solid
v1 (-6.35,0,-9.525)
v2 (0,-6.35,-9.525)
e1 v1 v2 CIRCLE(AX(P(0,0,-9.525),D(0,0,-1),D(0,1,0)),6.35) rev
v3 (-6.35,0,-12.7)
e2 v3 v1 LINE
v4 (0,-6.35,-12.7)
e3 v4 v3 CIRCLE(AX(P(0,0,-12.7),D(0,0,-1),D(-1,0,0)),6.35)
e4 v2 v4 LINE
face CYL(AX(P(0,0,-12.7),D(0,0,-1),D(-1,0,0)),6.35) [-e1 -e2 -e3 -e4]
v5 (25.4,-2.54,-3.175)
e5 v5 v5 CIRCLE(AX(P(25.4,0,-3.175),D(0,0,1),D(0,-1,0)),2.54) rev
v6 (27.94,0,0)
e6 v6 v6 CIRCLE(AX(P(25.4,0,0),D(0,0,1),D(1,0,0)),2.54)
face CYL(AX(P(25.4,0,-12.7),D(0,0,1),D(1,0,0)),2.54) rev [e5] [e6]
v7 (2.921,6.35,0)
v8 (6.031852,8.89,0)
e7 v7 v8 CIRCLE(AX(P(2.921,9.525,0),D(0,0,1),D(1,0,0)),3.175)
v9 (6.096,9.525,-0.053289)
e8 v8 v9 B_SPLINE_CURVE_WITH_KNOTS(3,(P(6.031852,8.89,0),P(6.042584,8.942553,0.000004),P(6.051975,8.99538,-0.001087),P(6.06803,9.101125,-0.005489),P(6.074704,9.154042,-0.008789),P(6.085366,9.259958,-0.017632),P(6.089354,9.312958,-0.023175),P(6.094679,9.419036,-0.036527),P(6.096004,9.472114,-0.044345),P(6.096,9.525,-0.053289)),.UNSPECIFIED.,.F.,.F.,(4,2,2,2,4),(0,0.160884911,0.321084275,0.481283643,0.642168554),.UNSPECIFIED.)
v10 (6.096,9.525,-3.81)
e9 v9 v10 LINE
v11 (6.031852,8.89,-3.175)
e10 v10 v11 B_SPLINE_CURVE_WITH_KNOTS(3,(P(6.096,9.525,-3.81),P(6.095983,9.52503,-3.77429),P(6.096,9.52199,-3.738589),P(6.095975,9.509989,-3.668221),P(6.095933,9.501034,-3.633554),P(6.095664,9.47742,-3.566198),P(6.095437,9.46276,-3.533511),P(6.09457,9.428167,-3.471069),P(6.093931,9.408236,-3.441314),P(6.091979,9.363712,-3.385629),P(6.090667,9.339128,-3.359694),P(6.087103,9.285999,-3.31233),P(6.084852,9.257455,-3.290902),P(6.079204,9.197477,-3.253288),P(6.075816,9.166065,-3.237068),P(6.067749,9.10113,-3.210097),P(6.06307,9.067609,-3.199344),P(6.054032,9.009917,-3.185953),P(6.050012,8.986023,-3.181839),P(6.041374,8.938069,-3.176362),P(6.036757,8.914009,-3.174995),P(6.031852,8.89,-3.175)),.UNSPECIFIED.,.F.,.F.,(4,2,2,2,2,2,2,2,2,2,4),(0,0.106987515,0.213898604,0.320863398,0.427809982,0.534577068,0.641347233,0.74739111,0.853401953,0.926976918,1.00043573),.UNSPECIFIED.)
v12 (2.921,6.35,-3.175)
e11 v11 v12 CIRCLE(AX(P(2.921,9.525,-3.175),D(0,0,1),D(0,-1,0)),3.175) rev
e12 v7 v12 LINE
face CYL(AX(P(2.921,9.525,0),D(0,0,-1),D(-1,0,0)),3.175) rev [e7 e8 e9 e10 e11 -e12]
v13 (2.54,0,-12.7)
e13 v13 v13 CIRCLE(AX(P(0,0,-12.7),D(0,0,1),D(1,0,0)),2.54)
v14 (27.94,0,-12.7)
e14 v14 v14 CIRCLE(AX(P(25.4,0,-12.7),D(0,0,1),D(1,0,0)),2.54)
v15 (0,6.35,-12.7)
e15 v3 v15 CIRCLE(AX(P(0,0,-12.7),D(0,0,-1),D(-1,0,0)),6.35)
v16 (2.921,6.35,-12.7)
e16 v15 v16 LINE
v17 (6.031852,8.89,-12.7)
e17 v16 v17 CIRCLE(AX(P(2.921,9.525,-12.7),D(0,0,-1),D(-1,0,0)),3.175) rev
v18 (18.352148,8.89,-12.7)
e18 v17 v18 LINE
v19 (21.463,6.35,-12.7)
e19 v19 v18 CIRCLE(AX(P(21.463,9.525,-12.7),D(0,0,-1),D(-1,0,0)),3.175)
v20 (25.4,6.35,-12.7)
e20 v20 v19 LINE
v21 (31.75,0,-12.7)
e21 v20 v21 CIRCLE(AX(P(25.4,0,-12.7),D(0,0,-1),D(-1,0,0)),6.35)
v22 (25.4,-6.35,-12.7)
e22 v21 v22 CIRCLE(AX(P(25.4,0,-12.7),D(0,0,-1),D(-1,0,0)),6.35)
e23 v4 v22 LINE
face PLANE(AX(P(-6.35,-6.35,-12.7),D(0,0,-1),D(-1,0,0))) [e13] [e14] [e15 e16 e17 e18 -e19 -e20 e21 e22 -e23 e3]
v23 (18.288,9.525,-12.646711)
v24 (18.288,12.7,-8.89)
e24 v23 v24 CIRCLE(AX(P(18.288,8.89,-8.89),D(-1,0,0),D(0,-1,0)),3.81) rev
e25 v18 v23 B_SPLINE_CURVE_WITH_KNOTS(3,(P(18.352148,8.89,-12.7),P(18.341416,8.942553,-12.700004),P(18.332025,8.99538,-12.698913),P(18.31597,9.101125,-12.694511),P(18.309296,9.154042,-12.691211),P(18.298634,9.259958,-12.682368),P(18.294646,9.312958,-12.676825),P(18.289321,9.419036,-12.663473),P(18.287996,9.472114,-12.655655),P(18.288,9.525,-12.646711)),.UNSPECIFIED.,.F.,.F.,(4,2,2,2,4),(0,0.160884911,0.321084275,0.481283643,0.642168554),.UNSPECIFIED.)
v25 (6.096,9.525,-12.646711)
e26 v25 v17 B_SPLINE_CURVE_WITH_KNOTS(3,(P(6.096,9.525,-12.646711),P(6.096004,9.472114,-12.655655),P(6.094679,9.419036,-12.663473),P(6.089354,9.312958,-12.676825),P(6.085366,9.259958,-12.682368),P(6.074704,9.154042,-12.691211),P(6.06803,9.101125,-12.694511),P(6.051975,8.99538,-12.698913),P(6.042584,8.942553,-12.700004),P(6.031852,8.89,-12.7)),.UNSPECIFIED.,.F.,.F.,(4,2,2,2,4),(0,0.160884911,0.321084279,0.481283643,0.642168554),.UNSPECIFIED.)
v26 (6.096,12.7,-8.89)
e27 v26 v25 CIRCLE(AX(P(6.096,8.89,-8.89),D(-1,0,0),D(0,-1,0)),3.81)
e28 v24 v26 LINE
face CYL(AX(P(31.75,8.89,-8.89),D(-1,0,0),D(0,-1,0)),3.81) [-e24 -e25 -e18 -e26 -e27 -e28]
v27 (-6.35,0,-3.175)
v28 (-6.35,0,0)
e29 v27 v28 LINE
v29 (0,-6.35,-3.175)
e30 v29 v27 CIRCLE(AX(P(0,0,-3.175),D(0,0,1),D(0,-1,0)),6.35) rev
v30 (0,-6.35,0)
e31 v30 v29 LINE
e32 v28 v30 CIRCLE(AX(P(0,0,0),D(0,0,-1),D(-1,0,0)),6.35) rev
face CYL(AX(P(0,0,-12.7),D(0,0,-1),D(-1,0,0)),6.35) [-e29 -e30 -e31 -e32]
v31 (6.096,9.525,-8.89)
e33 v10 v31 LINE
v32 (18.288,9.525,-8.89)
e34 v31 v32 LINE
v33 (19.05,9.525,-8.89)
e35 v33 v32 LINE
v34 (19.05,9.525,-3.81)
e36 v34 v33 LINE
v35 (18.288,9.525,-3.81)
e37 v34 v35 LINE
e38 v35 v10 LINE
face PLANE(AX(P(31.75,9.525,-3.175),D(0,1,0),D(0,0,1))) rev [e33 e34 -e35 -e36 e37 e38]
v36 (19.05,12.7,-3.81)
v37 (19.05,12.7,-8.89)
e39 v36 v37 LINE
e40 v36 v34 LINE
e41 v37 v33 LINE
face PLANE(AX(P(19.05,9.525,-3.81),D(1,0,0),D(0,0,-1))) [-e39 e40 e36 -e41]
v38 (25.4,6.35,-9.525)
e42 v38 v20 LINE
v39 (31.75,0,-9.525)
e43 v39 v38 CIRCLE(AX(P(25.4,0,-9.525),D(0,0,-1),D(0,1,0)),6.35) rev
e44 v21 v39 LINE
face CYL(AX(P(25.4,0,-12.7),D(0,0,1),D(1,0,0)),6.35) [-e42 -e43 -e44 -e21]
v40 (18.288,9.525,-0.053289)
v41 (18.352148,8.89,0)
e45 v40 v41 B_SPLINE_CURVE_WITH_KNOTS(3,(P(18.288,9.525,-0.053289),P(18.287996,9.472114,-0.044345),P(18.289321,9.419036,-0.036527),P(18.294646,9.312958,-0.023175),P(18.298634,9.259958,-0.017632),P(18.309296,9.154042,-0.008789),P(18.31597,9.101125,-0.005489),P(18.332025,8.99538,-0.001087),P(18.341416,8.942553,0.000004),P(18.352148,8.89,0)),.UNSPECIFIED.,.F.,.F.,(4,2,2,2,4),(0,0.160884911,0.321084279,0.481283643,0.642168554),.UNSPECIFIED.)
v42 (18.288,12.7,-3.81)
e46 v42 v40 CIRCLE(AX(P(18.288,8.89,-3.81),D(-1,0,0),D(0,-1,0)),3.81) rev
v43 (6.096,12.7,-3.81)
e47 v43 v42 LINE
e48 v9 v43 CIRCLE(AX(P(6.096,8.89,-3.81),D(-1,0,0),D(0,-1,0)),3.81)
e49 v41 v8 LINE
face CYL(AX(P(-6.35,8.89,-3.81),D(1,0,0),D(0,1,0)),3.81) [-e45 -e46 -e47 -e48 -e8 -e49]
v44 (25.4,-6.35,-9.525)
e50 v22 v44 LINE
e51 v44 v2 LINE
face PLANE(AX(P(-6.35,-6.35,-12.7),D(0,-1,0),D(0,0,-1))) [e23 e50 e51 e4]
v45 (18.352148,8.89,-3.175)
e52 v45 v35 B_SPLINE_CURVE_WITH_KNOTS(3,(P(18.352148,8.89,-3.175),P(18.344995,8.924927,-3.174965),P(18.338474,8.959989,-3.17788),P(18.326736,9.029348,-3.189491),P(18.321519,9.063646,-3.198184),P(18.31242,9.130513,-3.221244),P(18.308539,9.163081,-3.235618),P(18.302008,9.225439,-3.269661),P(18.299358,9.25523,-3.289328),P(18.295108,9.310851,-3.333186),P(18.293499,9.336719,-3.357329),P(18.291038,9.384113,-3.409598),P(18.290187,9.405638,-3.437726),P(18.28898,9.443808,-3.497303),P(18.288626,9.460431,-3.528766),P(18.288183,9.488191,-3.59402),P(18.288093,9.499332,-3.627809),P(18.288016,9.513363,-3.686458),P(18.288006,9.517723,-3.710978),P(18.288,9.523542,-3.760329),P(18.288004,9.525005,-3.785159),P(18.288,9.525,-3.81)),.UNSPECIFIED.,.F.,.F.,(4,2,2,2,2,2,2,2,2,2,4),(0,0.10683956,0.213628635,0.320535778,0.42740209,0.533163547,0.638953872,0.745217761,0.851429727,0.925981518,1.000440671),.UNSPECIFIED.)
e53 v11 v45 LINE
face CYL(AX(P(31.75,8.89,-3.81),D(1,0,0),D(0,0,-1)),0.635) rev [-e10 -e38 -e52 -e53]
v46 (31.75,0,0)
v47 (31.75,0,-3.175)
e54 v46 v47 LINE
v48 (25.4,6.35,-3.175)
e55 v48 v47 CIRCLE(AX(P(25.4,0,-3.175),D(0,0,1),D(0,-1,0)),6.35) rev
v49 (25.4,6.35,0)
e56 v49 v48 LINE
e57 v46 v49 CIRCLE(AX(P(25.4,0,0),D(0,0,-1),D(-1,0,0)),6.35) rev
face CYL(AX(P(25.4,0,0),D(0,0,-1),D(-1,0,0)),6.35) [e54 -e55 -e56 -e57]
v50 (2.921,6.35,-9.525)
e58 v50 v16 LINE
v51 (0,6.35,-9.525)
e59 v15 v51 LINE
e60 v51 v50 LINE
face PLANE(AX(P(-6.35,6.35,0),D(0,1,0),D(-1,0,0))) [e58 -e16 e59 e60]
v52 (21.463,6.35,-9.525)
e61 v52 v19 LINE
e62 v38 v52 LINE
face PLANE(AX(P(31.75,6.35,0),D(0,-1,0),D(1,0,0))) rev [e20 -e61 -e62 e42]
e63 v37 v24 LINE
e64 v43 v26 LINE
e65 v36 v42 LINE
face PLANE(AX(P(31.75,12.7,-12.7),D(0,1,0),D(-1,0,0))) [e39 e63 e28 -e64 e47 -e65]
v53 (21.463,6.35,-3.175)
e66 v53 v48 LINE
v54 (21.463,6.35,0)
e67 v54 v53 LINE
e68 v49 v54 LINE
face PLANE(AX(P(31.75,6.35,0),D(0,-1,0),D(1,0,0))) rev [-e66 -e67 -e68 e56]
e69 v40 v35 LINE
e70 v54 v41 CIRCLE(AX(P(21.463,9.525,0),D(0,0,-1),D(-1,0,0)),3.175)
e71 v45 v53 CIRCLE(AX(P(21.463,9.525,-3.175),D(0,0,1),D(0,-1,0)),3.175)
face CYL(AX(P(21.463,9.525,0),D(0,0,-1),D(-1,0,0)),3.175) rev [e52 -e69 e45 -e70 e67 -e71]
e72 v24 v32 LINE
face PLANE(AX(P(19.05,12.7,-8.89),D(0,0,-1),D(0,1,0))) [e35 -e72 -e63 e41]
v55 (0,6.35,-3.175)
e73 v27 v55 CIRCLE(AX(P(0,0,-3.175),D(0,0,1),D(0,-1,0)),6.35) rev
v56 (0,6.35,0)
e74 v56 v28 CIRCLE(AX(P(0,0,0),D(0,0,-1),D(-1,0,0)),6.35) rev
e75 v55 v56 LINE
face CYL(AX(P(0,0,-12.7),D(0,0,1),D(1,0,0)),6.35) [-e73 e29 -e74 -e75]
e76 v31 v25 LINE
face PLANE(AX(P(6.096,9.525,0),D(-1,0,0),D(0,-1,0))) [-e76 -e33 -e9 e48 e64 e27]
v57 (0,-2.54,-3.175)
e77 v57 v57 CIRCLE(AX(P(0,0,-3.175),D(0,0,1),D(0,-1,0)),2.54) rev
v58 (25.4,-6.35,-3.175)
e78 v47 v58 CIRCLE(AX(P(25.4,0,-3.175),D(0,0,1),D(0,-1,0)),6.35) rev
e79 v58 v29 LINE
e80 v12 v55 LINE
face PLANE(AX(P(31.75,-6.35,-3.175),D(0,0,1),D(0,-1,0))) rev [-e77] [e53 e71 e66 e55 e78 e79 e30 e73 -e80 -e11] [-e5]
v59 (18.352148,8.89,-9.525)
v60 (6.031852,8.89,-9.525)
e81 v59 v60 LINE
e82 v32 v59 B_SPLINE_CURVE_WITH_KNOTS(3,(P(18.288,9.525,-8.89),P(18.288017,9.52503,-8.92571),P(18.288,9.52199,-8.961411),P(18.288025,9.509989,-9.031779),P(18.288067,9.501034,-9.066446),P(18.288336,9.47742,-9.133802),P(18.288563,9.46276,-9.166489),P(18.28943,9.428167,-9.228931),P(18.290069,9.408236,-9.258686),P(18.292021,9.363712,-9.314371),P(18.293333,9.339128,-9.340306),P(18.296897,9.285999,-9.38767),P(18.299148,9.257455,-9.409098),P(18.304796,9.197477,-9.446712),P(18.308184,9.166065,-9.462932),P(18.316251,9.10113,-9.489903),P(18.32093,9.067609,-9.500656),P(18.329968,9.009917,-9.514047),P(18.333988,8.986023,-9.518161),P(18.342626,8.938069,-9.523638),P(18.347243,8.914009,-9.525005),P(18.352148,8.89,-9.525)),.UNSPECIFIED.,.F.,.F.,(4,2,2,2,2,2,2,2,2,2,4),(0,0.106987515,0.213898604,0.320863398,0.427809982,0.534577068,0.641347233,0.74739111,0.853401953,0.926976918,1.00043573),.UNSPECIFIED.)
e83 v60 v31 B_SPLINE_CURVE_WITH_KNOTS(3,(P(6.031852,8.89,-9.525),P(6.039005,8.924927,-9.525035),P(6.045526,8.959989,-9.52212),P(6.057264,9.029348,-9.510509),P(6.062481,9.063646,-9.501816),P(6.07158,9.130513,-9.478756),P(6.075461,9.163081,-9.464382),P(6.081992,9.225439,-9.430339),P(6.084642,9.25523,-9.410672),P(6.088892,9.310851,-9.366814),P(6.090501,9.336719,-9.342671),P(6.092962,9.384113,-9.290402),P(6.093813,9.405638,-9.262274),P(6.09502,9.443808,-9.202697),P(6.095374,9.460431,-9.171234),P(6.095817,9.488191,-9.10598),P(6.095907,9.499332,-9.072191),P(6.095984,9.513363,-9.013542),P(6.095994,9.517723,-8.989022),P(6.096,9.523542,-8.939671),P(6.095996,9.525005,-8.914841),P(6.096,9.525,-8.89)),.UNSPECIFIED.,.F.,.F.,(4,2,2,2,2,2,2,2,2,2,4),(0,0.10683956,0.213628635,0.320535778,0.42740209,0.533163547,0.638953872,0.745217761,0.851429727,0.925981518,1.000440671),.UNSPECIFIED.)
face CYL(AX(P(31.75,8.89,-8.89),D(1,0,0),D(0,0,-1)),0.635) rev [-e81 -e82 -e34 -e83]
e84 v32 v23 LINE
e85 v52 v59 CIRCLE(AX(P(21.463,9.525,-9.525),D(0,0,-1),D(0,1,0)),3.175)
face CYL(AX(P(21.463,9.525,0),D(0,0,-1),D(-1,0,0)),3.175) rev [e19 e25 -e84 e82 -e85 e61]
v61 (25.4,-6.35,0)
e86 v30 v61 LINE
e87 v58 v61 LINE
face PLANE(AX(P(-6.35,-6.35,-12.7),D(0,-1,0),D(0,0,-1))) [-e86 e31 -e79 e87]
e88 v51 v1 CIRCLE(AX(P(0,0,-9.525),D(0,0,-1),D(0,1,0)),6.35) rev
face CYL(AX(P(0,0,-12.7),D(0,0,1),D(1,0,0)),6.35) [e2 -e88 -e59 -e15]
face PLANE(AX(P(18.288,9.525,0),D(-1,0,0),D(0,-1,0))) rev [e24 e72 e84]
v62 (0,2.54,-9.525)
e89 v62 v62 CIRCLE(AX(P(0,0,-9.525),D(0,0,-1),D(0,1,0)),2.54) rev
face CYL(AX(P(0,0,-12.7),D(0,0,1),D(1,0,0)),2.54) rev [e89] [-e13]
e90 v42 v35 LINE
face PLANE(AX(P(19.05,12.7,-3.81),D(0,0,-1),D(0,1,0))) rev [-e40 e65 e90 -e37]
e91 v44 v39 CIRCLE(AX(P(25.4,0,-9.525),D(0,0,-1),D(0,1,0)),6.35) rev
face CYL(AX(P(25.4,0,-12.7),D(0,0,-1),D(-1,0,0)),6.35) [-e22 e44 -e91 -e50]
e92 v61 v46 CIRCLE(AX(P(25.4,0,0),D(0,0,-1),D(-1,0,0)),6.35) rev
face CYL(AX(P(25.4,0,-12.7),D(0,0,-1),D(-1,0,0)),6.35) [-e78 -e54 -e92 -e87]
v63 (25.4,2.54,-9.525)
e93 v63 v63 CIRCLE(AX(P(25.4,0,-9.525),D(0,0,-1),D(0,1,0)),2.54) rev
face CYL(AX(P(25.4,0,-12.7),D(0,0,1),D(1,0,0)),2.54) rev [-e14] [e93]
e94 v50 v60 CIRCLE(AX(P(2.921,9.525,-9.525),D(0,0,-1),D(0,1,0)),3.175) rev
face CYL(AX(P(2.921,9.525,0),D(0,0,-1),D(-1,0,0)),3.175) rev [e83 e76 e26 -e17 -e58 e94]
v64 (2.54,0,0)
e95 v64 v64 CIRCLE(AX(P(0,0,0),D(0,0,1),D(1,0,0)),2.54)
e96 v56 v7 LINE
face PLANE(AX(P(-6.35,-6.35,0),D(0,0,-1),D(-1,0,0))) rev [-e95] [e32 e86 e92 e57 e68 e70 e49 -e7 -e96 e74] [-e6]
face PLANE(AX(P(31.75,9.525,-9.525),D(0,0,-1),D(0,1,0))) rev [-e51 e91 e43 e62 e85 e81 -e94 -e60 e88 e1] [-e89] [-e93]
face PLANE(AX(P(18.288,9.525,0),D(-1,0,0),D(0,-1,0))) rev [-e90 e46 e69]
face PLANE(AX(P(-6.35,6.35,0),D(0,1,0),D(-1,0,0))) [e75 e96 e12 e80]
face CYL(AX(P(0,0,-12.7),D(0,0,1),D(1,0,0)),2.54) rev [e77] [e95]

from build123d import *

# Parameters (mm, degrees)
SKETCH1_W           = 38.1
SKETCH1_H           = 19.05
SKETCH1_R           = 2.54
BASE_EXTRUDE_DEPTH  = 12.7
CUT_EXTRUDE1_DEPTH  = 43.121134838
CUT_EXTRUDE2_DEPTH  = 37.477972806
CUT_EXTRUDE3_DEPTH  = 37.477972806
FILLET1_R           = 0.635
FILLET2_R           = 3.81
FILLET3_R           = 6.35
SKETCH6_W           = 5.08
SKETCH6_H           = 3.175
BOSS_EXTRUDE1_DEPTH = 0.762


# Some blends are built 0.0001 mm under size
with BuildPart() as part:
    # Sketch1 → Base-Extrude (new body)
    with BuildSketch(Plane.XY):
        with Locations((12.7, 3.175)):
            Rectangle(SKETCH1_W, SKETCH1_H)
        Circle(SKETCH1_R, mode=Mode.SUBTRACT)
        with Locations((25.4, 0)):
            Circle(SKETCH1_R, mode=Mode.SUBTRACT)
    extrude(amount=-BASE_EXTRUDE_DEPTH)

    # Sketch3 → Cut-Extrude1 (cut, through all)
    with BuildSketch(Plane(origin=(31.75, 0, 0), x_dir=(0, 0, -1), z_dir=(1, 0, 0))):
        Polygon((3.175, -58.947094971), (3.175, -6.35), (3.175, 9.525), (9.525, 9.525), (9.525, -6.35), (9.525, -58.947094971), (9.525, -164.141284914), (3.175, -164.141284914), align=None)
    extrude(amount=-CUT_EXTRUDE1_DEPTH, mode=Mode.SUBTRACT)

    # Sketch4 → Cut-Extrude2 (cut, through all)
    with BuildSketch(Plane.XY):
        with BuildLine():
            Line((-96.671852568, 6.35), (-6.35, 6.35))
            Line((-6.35, 6.35), (2.921, 6.35))
            ThreePointArc((2.921, 6.35), (5.16606403, 7.27993597), (6.096, 9.525))
            Line((6.096, 9.525), (6.096, 12.7))
            Line((6.096, 12.7), (6.096, 103.021852568))
            Line((6.096, 103.021852568), (-117.676302849, 234.599074203))
            Line((-117.676302849, 234.599074203), (-220.444155417, 137.927221634))
            Line((-220.444155417, 137.927221634), (-96.671852568, 6.35))
        make_face()
    extrude(amount=-CUT_EXTRUDE2_DEPTH, mode=Mode.SUBTRACT)

    # Sketch5 → Cut-Extrude3 (cut, through all)
    with BuildSketch(Plane.XY):
        with BuildLine():
            Line((122.071852568, 6.35), (31.75, 6.35))
            Line((31.75, 6.35), (21.463, 6.35))
            ThreePointArc((21.463, 6.35), (19.21793597, 7.27993597), (18.288, 9.525))
            Line((18.288, 9.525), (18.288, 12.7))
            Line((18.288, 12.7), (18.288, 103.021852568))
            Line((18.288, 103.021852568), (141.41301137, 235.20498228))
            Line((141.41301137, 235.20498228), (245.196863939, 138.533129712))
            Line((245.196863939, 138.533129712), (122.071852568, 6.35))
        make_face()
    extrude(amount=-CUT_EXTRUDE3_DEPTH, mode=Mode.SUBTRACT)

    # Fillet1
    # the kernel refuses this fillet: 0.635 mm, written as the material it adds along each edge
    with BuildSketch(Plane(origin=(19.8755, 9.525, -9.525), x_dir=(0, 0, 1), z_dir=(-1, 0, 0))) as fillet1_piece_1_section:
        with BuildLine():
            CenterArc((FILLET1_R, -FILLET1_R), FILLET1_R, 90, 90)
            Line((0, -FILLET1_R), (0, 0))
            Line((0, 0), (FILLET1_R, 0))
        make_face()
    fillet1_piece_1 = extrude(amount=15.367, mode=Mode.PRIVATE)
    fillet1_piece_1 = fillet1_piece_1 - Plane(origin=(2.921, 9.525, -9.486385911), x_dir=(0, -1, 0), z_dir=(0, 0, 1)) * Cylinder(3.175, 34, mode=Mode.PRIVATE)
    fillet1_piece_1 = fillet1_piece_1 - Plane(origin=(21.463, 9.525, -9.486385911), x_dir=(0, -1, 0), z_dir=(0, 0, 1)) * Cylinder(3.175, 34, mode=Mode.PRIVATE)
    add(fillet1_piece_1)
    with BuildSketch(Plane(origin=(19.8755, 9.525, -3.175), x_dir=(0, -1, 0), z_dir=(-1, 0, 0))) as fillet1_piece_2_section:
        with BuildLine():
            CenterArc((FILLET1_R, -FILLET1_R), FILLET1_R, 90, 90)
            Line((0, -FILLET1_R), (0, 0))
            Line((0, 0), (FILLET1_R, 0))
        make_face()
    fillet1_piece_2 = extrude(amount=15.367, mode=Mode.PRIVATE)
    fillet1_piece_2 = fillet1_piece_2 - Plane(origin=(21.463, 9.525, -3.21361614), x_dir=(0, -1, 0), z_dir=(0, 0, 1)) * Cylinder(3.175, 34, mode=Mode.PRIVATE)
    fillet1_piece_2 = fillet1_piece_2 - Plane(origin=(2.921, 9.525, -3.21361614), x_dir=(0, -1, 0), z_dir=(0, 0, 1)) * Cylinder(3.175, 34, mode=Mode.PRIVATE)
    add(fillet1_piece_2)

    # Fillet2
    fillet2_edges = [part.edges().sort_by_distance(p)[0] for p in [
        (12.192, 12.7, 0),
        (12.192, 12.7, -12.7),
    ]]
    fillet(fillet2_edges, radius=FILLET2_R)

    # Fillet3
    fillet3_edges = [part.edges().sort_by_distance(p)[0] for p in [
        (-6.35, -6.35, -1.5875),
        (31.75, -6.35, -1.5875),
        (-6.35, 6.35, -1.5875),
        (-6.35, 6.35, -11.1125),
        (31.75, 6.35, -11.1125),
        (-6.35, -6.35, -11.1125),
        (31.75, 6.35, -1.5875),
        (31.75, -6.35, -11.1125),
    ]]
    fillet(fillet3_edges, radius=FILLET3_R - 0.0001)  # a hair under: the kernel refuses the full size

    # Sketch6 → Boss-Extrude1 (add)
    with BuildSketch(Plane(origin=(18.288, 0, 0), x_dir=(0, 0, -1), z_dir=(1, 0, 0))):
        with Locations((6.35, 11.1125)):
            Rectangle(SKETCH6_W, SKETCH6_H)
    extrude(amount=BOSS_EXTRUDE1_DEPTH)


solid = part.part
